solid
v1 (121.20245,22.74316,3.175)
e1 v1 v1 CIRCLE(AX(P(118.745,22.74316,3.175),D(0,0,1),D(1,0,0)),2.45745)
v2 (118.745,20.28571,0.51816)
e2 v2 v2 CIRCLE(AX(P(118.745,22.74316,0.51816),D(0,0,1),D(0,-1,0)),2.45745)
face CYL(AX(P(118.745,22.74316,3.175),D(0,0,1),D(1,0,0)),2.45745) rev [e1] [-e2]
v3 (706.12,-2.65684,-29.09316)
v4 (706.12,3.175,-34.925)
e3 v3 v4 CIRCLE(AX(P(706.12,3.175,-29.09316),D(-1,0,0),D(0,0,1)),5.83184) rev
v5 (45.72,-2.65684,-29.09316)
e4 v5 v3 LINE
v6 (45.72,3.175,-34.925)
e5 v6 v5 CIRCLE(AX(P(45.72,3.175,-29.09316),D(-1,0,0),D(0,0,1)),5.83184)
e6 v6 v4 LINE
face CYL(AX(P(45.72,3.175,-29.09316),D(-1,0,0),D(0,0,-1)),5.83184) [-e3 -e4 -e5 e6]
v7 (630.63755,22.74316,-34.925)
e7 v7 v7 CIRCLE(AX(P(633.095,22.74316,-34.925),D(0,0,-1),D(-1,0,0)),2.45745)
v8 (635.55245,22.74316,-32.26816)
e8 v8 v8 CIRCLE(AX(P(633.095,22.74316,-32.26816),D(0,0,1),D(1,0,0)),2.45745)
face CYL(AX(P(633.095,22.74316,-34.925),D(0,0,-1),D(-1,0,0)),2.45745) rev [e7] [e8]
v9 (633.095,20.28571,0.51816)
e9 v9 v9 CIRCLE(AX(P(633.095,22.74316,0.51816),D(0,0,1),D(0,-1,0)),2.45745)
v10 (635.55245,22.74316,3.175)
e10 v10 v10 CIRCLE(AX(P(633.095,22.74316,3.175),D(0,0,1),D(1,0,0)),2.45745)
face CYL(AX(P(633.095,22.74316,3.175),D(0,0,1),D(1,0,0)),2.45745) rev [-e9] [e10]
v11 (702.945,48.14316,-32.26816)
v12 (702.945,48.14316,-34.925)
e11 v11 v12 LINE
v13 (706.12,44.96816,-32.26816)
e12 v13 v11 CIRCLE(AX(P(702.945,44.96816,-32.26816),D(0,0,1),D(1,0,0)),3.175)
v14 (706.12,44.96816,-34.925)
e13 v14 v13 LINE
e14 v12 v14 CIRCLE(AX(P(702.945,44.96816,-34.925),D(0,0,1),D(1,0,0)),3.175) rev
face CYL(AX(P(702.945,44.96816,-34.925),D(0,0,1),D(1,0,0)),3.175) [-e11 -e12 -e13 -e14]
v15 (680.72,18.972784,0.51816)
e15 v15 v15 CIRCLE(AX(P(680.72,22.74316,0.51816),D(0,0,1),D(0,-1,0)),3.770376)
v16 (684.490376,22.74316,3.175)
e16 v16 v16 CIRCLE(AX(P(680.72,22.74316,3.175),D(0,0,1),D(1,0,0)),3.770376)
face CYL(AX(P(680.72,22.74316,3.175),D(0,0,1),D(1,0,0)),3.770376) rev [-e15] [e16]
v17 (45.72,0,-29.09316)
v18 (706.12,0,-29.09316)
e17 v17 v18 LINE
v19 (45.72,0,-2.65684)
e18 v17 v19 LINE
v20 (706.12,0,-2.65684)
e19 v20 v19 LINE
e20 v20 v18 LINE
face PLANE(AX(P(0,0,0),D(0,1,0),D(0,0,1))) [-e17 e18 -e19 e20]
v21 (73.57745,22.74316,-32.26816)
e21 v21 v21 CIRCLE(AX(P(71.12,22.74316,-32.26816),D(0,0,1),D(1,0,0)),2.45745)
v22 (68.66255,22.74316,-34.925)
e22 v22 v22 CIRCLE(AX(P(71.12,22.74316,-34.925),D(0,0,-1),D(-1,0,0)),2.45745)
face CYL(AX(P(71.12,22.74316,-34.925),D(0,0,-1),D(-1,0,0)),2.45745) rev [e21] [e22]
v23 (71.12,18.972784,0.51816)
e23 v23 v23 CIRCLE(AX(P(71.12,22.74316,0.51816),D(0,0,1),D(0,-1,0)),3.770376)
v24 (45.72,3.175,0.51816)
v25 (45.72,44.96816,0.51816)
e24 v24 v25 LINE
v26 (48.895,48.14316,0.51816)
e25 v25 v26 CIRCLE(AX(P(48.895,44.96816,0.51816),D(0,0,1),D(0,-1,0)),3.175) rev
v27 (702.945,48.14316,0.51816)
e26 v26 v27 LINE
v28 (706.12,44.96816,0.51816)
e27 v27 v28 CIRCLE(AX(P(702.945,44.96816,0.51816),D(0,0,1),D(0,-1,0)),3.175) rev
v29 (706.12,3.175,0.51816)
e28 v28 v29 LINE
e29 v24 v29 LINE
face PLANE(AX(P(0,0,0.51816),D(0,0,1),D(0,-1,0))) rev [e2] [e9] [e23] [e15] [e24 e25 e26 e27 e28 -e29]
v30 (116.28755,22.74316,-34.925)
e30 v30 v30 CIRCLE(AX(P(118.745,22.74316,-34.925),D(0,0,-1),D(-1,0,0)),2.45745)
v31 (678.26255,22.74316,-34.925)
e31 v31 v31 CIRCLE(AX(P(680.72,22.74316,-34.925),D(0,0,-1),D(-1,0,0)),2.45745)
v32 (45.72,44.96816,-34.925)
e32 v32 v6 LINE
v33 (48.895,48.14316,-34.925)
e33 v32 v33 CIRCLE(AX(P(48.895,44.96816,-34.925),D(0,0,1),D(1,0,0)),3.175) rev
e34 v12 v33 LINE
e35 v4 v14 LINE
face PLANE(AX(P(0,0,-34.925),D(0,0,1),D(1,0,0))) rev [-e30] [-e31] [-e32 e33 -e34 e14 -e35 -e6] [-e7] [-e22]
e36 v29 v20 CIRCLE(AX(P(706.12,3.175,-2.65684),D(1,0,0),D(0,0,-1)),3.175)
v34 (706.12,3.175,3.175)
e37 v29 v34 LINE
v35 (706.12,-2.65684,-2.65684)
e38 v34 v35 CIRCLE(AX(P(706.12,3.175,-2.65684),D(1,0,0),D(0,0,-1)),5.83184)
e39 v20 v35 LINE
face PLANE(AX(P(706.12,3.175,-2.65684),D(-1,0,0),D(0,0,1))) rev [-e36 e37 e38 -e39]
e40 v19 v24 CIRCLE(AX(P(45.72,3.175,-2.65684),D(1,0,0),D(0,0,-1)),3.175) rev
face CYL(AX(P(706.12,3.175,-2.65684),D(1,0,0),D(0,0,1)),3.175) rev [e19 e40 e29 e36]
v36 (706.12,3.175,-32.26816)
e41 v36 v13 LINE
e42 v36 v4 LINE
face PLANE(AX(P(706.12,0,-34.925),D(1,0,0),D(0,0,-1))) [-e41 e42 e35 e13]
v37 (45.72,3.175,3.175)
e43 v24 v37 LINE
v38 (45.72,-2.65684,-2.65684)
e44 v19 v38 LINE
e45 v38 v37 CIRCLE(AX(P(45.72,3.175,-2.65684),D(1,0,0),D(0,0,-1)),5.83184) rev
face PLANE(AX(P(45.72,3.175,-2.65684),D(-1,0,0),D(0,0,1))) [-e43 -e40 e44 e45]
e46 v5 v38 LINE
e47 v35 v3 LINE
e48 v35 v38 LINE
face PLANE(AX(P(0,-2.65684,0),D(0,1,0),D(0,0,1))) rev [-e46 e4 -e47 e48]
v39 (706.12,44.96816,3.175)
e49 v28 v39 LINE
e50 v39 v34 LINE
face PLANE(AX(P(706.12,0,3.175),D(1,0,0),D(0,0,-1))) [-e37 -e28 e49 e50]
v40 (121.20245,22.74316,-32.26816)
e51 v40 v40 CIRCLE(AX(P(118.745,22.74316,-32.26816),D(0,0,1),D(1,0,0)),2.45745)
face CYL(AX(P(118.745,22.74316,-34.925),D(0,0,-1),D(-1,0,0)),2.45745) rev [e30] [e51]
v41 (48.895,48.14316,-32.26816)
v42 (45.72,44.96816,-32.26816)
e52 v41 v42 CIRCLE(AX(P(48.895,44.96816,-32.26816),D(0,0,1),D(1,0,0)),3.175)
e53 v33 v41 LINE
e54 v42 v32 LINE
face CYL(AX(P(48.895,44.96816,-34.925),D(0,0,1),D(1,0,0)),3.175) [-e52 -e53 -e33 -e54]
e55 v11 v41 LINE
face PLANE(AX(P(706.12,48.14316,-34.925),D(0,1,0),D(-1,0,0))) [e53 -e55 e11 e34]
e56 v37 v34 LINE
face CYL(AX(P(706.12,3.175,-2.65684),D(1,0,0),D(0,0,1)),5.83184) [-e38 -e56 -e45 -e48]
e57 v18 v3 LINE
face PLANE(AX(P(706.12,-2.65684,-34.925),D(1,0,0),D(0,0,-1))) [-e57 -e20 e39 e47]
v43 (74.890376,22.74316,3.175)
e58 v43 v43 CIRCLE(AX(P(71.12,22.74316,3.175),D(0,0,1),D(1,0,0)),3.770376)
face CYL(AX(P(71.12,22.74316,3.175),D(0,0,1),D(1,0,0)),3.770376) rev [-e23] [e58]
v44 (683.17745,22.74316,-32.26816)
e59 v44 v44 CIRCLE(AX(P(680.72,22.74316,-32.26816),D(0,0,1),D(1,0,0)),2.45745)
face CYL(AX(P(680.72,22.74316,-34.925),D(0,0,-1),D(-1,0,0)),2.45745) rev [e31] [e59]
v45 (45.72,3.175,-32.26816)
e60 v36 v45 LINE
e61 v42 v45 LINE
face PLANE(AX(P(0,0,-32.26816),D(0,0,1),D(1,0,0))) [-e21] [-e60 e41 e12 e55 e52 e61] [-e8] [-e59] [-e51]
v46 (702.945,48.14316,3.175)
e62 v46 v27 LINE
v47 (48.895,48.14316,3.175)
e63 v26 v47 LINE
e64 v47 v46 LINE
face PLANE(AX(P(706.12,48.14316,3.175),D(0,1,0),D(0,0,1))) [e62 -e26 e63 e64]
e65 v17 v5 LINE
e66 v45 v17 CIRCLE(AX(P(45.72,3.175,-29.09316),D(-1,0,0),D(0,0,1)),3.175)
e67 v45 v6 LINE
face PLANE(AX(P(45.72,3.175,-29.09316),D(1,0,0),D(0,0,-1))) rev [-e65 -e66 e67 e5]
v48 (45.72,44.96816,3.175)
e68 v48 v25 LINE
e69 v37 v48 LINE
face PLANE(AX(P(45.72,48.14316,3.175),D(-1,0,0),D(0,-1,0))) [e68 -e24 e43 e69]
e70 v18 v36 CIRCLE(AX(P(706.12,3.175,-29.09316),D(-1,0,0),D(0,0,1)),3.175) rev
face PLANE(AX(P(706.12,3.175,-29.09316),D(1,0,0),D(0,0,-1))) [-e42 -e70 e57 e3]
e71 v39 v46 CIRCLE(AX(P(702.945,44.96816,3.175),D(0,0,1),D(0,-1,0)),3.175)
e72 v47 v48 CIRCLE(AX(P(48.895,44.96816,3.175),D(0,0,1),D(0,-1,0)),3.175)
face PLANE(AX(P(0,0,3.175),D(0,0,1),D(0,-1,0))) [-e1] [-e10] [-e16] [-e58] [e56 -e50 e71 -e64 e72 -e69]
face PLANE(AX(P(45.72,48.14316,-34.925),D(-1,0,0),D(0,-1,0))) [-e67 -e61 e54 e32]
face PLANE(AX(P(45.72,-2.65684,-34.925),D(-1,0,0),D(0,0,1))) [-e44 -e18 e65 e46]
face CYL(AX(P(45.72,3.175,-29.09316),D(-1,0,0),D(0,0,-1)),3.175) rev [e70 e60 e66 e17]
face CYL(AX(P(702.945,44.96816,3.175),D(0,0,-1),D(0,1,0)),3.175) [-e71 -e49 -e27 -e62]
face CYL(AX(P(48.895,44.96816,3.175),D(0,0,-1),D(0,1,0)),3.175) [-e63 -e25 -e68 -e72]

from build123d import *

# Parameters (mm, degrees)
SKETCH1_W                            = 660.4
SKETCH1_H                            = 38.1
BASE_FLANGE1_DEPTH                   = 2.65684
EDGE_FLANGE1_STRIP_W                 = 16.97736
EDGE_FLANGE1_STRIP_H                 = 2.65684
EDGE_FLANGE1_STRIP_CUT_DEPTH         = 660.4
EDGE_FLANGE1_STRIP_2_W               = 16.97736
EDGE_FLANGE1_STRIP_2_H               = 2.65684
EDGE_FLANGE1_STRIP_CUT_2_DEPTH       = 660.4
EDGE_FLANGE1_DEPTH                   = 660.4
EDGE_FLANGE1_BEND_DEPTH              = 660.4
F_10_0_1935_DIAMETER_HOLE2_D         = 4.9149
F_10_0_1935_DIAMETER_HOLE2_DEPTH     = 2.65684
FILLET1_R                            = 3.175
F_10_0_1935_DIAMETER_HOLE3_D         = 4.9149
F_19_64_0_29688_DIAMETER_HOLE1_D     = 7.540752
F_19_64_0_29688_DIAMETER_HOLE1_DEPTH = 2.65684


# Sheet-metal steps are written as plain solids
with BuildPart() as part:
    # Sketch1 → Base-Flange1 (new body)
    with BuildSketch(Plane(origin=(0, 0, 0), x_dir=(1, 0, 0), z_dir=(0, 1, 0))):
        with Locations((375.92, 15.875)):
            Rectangle(SKETCH1_W, SKETCH1_H)
    extrude(amount=-BASE_FLANGE1_DEPTH)

    # Edge-Flange1 strip (across the edge) → Edge-Flange1 strip cut (cut)
    with BuildSketch(Plane(origin=(45.72, 0, 3.175), x_dir=(0, 0, -1), z_dir=(1, 0, 0))):
        with Locations((-2.65684, -1.32842)):
            Rectangle(EDGE_FLANGE1_STRIP_W, EDGE_FLANGE1_STRIP_H)
    extrude(amount=EDGE_FLANGE1_STRIP_CUT_DEPTH, mode=Mode.SUBTRACT)

    # Edge-Flange1 strip 2 (across the edge) → Edge-Flange1 strip cut 2 (cut)
    with BuildSketch(Plane(origin=(706.12, 0, -34.925), x_dir=(0, 0, 1), z_dir=(-1, 0, 0))):
        with Locations((-2.65684, -1.32842)):
            Rectangle(EDGE_FLANGE1_STRIP_2_W, EDGE_FLANGE1_STRIP_2_H)
    extrude(amount=EDGE_FLANGE1_STRIP_CUT_2_DEPTH, mode=Mode.SUBTRACT)

    # Edge-Flange1 section (across the edge) → Edge-Flange1 (add)
    with BuildSketch(Plane(origin=(45.72, 0, 3.175), x_dir=(0, 0, -1), z_dir=(1, 0, 0))):
        with BuildLine():
            Line((0, 3.175), (0, 48.14316))
            Line((0, 48.14316), (2.65684, 48.14316))
            Line((2.65684, 48.14316), (2.65684, 3.175))
            ThreePointArc((2.65684, 3.175), (3.58677597, 0.92993597), (5.83184, 0))
            Line((5.83184, 0), (5.83184, -2.65684))
            ThreePointArc((5.83184, -2.65684), (1.708106389, -0.948733611), (0, 3.175))
        make_face()
    extrude(amount=EDGE_FLANGE1_DEPTH)

    # Edge-Flange1 section 2 (across the edge) → Edge-Flange1 bend (add)
    with BuildSketch(Plane(origin=(706.12, 0, -34.925), x_dir=(0, 0, 1), z_dir=(-1, 0, 0))):
        with BuildLine():
            Line((0, 3.175), (0, 48.14316))
            Line((0, 48.14316), (2.65684, 48.14316))
            Line((2.65684, 48.14316), (2.65684, 3.175))
            ThreePointArc((2.65684, 3.175), (3.58677597, 0.92993597), (5.83184, 0))
            Line((5.83184, 0), (5.83184, -2.65684))
            ThreePointArc((5.83184, -2.65684), (1.708106389, -0.948733611), (0, 3.175))
        make_face()
    extrude(amount=EDGE_FLANGE1_BEND_DEPTH)

    # #10 (0.1935) Diameter Hole2
    with Locations(Plane(origin=(0, 0, -34.925), x_dir=(-1, 0, 0), z_dir=(0, 0, -1))):
        with Locations((-680.72, 22.74316), (-633.095, 22.74316), (-118.745, 22.74316), (-71.12, 22.74316)):
            Hole(F_10_0_1935_DIAMETER_HOLE2_D / 2, depth=F_10_0_1935_DIAMETER_HOLE2_DEPTH)

    # Fillet1
    fillet1_edges = [part.edges().sort_by_distance(p)[0] for p in [
        (45.72, 48.14316, 1.84658),
        (706.12, 48.14316, 1.84658),
        (706.12, 48.14316, -33.59658),
        (45.72, 48.14316, -33.59658),
    ]]
    fillet(fillet1_edges, radius=FILLET1_R)

    # #10 (0.1935) Diameter Hole3 (through all)
    with Locations(Plane.XY.offset(3.175)):
        with Locations((633.095, 22.74316), (118.745, 22.74316)):
            Hole(F_10_0_1935_DIAMETER_HOLE3_D / 2)

    # 19/64 (0.29688) Diameter Hole1
    with Locations(Plane.XY.offset(3.175)):
        with Locations((71.12, 22.74316), (680.72, 22.74316)):
            Hole(F_19_64_0_29688_DIAMETER_HOLE1_D / 2, depth=F_19_64_0_29688_DIAMETER_HOLE1_DEPTH)


solid = part.part
